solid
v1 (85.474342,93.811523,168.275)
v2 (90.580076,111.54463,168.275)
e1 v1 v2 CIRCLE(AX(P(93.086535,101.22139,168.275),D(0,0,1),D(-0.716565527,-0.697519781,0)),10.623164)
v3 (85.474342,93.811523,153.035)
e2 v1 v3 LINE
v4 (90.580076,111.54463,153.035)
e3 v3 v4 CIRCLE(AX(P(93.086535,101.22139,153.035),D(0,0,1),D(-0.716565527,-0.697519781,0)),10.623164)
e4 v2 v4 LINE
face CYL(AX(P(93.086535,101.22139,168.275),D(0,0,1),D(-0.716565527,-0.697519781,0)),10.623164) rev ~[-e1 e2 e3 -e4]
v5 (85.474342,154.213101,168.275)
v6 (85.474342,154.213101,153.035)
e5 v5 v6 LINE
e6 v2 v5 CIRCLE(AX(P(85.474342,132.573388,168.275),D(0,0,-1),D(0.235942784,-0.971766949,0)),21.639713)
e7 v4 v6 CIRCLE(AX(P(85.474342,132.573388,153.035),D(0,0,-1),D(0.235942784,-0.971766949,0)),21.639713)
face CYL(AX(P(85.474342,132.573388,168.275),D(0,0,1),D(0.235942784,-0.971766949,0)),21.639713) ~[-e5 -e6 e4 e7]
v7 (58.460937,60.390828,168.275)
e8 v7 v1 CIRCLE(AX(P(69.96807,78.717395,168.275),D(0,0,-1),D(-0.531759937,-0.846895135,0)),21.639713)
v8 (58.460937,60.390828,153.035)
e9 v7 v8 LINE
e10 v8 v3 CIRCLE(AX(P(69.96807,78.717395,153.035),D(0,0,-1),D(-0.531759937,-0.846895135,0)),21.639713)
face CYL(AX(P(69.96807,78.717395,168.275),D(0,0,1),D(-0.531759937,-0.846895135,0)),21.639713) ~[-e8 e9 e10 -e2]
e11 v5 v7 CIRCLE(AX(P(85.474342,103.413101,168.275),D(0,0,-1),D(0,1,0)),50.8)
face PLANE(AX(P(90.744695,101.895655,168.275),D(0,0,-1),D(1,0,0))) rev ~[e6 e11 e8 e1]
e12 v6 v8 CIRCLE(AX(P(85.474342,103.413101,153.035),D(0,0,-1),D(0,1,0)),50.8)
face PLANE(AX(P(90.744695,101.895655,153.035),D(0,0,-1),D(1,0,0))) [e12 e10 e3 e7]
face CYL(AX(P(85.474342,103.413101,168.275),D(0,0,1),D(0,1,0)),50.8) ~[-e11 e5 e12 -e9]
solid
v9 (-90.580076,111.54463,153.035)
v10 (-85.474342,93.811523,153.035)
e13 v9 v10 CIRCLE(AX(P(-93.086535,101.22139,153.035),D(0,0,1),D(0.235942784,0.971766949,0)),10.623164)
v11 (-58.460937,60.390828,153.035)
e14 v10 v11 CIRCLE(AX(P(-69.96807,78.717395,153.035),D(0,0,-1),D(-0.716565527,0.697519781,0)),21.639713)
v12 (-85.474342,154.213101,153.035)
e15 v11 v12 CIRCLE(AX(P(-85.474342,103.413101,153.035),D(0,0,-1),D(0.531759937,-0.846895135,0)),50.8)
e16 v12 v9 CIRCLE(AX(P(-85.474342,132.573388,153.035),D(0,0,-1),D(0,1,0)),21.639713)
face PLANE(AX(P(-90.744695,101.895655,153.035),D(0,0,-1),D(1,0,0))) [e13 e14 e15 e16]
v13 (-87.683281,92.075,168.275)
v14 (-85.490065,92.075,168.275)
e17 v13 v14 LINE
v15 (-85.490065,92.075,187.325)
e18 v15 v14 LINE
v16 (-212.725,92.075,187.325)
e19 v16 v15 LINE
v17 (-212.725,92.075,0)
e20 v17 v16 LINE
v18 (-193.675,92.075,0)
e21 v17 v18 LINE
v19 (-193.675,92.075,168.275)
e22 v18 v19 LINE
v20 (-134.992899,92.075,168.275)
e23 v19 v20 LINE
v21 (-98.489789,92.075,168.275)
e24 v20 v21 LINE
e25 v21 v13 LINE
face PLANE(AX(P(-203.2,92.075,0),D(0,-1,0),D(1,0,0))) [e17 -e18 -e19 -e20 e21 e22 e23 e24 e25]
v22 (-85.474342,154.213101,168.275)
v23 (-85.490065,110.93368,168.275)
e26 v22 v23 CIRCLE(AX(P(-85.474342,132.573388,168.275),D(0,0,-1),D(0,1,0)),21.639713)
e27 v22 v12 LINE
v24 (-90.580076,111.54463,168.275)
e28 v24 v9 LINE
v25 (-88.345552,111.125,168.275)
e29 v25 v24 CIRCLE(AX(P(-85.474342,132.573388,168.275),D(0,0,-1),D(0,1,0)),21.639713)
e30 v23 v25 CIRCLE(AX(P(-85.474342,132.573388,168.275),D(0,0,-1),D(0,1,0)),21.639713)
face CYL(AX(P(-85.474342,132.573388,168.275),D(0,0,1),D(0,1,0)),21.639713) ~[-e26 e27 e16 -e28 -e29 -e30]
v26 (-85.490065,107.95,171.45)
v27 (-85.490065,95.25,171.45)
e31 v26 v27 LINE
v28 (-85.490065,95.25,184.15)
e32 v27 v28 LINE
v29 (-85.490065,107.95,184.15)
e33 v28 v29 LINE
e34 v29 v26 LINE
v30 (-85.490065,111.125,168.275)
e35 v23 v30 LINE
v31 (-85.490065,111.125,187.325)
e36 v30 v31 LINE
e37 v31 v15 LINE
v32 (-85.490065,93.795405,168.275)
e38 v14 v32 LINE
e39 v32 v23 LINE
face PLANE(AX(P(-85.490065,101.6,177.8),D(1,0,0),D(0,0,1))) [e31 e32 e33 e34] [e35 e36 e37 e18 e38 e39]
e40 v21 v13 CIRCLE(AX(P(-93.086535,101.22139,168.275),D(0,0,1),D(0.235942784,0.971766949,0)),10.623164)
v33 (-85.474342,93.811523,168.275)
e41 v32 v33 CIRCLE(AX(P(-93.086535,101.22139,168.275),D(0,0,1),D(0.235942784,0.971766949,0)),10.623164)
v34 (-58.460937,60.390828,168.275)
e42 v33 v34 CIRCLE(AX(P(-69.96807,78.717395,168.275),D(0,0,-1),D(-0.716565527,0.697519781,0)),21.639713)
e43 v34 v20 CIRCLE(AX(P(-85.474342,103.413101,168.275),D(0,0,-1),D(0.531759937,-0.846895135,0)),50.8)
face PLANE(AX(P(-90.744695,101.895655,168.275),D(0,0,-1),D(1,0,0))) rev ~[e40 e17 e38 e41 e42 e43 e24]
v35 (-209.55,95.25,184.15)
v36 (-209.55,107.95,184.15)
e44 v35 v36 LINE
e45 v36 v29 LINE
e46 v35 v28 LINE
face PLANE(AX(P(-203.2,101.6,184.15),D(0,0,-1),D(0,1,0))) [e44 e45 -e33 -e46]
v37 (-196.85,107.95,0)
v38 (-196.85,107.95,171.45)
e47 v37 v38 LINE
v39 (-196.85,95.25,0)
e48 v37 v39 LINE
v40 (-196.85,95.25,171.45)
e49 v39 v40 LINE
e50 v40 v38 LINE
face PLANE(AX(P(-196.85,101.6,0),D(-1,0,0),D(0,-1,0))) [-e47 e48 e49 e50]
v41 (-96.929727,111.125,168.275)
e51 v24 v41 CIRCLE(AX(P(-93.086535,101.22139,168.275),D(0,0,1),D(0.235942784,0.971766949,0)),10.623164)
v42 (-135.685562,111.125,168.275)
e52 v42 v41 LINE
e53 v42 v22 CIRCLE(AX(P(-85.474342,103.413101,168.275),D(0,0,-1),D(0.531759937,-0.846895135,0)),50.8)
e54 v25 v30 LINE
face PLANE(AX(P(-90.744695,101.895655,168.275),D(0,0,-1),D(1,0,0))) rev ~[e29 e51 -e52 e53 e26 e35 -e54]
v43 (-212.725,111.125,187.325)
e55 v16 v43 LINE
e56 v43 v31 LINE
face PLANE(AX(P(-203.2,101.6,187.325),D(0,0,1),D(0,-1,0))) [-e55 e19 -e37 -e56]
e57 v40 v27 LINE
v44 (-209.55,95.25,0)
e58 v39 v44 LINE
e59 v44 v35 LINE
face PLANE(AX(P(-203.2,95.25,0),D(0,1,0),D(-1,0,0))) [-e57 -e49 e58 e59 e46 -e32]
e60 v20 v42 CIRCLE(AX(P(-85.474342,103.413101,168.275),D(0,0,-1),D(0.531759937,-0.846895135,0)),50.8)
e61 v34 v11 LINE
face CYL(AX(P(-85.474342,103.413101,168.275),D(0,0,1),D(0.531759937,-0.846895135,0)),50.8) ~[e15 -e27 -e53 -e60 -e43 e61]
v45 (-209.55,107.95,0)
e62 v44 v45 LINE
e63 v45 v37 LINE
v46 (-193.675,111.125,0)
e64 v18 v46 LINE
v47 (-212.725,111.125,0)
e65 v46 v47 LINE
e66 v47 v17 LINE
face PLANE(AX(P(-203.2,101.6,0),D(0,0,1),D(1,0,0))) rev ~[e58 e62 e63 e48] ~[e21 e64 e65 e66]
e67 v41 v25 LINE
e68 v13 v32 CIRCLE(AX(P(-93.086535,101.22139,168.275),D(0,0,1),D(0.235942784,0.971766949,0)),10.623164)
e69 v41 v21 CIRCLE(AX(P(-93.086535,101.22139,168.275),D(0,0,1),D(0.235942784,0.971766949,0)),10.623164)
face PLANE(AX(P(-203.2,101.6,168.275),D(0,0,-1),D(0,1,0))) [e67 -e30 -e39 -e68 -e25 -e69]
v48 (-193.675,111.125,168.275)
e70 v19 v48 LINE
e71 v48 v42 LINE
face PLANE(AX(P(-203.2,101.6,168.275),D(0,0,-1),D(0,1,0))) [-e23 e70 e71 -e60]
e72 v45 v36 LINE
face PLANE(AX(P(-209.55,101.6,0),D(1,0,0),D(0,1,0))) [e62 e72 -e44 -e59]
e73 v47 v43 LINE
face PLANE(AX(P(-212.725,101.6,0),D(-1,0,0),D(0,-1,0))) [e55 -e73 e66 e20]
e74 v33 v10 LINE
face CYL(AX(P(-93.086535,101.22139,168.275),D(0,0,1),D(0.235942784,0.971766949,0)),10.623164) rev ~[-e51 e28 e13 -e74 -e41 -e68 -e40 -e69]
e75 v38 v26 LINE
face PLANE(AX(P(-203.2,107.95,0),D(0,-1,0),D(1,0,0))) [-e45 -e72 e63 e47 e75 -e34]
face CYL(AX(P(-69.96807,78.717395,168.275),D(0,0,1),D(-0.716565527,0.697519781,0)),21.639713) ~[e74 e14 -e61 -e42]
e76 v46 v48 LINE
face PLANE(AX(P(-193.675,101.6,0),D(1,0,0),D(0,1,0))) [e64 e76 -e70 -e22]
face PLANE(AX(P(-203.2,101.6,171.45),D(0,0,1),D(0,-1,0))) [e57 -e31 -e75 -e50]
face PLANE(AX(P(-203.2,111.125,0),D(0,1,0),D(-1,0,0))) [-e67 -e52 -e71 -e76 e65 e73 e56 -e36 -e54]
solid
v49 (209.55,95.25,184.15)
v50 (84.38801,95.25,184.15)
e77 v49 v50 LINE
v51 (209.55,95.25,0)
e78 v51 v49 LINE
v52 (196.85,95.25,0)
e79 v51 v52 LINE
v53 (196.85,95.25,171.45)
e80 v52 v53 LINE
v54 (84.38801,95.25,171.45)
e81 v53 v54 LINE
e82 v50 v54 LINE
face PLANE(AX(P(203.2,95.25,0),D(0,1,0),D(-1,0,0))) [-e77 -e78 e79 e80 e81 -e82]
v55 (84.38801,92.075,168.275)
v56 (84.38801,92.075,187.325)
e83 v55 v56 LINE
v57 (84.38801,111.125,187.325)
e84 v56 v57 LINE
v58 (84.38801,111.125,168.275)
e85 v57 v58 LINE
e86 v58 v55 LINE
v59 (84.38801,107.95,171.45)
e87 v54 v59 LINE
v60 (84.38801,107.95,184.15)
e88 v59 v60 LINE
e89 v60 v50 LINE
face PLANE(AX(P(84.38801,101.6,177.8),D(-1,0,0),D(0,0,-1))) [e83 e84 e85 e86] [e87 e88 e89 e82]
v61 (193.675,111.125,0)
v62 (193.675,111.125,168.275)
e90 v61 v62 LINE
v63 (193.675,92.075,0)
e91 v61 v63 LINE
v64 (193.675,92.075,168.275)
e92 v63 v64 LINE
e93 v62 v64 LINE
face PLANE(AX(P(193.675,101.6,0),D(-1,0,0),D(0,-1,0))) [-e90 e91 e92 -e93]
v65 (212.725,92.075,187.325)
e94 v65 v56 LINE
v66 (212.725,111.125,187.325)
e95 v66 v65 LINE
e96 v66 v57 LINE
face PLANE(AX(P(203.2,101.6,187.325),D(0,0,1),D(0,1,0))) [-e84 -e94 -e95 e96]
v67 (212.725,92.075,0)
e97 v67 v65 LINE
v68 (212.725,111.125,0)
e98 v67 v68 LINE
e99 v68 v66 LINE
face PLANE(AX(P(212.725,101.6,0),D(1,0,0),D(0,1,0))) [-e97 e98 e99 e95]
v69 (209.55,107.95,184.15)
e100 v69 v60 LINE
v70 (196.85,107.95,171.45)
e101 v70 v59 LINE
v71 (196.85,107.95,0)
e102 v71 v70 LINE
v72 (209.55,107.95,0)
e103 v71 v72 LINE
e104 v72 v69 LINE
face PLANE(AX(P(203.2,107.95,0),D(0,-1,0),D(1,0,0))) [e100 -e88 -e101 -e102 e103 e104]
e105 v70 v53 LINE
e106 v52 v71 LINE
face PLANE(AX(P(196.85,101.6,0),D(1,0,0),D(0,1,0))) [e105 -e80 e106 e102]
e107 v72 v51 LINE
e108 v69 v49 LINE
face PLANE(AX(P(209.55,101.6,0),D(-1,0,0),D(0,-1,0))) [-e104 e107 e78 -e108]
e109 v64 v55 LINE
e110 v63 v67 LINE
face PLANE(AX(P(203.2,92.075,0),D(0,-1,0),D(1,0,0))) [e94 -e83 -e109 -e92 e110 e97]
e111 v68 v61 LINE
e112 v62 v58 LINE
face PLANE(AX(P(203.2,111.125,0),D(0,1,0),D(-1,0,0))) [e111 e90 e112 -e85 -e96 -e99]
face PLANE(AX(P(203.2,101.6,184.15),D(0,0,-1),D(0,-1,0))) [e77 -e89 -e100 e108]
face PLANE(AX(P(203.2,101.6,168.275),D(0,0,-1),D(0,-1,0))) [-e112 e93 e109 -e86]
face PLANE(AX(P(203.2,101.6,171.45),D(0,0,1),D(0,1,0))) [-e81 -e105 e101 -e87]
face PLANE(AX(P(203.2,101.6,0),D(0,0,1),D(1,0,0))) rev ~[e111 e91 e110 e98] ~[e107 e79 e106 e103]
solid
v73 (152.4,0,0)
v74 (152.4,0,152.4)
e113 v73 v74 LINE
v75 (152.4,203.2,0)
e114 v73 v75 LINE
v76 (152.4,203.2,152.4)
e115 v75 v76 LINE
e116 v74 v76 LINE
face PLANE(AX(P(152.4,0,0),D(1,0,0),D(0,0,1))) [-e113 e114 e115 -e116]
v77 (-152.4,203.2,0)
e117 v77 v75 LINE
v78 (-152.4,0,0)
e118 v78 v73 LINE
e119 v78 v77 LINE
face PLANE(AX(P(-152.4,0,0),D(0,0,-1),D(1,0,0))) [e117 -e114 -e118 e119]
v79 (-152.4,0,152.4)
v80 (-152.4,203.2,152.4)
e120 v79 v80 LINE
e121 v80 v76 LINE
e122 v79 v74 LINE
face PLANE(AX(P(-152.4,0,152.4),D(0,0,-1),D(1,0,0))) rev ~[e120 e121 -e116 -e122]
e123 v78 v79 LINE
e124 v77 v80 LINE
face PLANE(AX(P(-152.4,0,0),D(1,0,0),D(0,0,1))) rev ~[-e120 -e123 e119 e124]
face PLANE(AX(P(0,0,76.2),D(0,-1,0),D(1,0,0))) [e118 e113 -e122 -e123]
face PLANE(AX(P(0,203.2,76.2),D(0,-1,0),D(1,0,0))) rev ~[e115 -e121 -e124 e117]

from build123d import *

# Parameters (mm, degrees)
F0_W     = 304.8
F0_H     = 152.4
F1_DEPTH = 203.2
F4_W     = 19.05
F4_H     = 19.05
F4_W_2   = 12.7
F4_H_2   = 12.7
F8_DEPTH = 15.24


with BuildPart() as f1:
    # F0 (on Front) → F1 (new body)
    with BuildSketch(Plane.XZ):
        with Locations((0, 76.2)):
            Rectangle(F0_W, F0_H)
    extrude(amount=-F1_DEPTH)


with BuildPart() as f5:
    # F5: sweep along a path in F3
    with BuildLine(Plane.XZ.offset(-101.6)) as f5_path:
        Line((203.2, 0), (203.2, 177.8))
        Line((203.2, 177.8), (84.3880101994, 177.8))
    # F4 (on Top) → F5 (sweep)
    with BuildSketch(Plane.XY):
        with Locations((203.2, 101.6)):
            Rectangle(F4_W, F4_H)
        with Locations((203.2, 101.6)):
            Rectangle(F4_W_2, F4_H_2, mode=Mode.SUBTRACT)
    sweep(path=f5_path.line, transition=Transition.RIGHT)


with BuildPart() as f6:
    # F6: sweep along a path in F3
    with BuildLine(Plane.XZ.offset(-101.6)) as f6_path:
        Line((-203.2, 0), (-203.2, 177.8))
        Line((-203.2, 177.8), (-85.4900650759, 177.8))
    # F4 (on Top) → F6 (sweep)
    with BuildSketch(Plane.XY):
        with Locations((-203.2, 101.6)):
            Rectangle(F4_W, F4_H)
        with Locations((-203.2, 101.6)):
            Rectangle(F4_W_2, F4_H_2, mode=Mode.SUBTRACT)
    sweep(path=f6_path.line, transition=Transition.RIGHT)

    # F7 (on face) → F8 (join)
    with BuildSketch(Plane(origin=(0, 0, 168.275), x_dir=(1, 0, 0), z_dir=(0, 0, -1))):
        with BuildLine():
            ThreePointArc((-58.4609373129, -60.3908278193), (-134.2912011879, -89.357700658), (-85.4743421078, -154.2131006718))
            ThreePointArc((-85.4743421078, -154.2131006718), (-63.9879107494, -130.0023087379), (-90.5800762449, -111.5446297711))
            ThreePointArc((-90.5800762449, -111.5446297711), (-103.2949896459, -98.2821615992), (-85.4743421078, -93.8115233757))
            ThreePointArc((-85.4743421078, -93.8115233757), (-53.1385123205, -92.3204531035), (-58.4609373129, -60.3908278193))
        make_face()
    extrude(amount=F8_DEPTH)


with BuildPart() as f8:
    # F7 (on face) → F8, piece 2 (new body)
    with BuildSketch(Plane(origin=(0, 0, 168.275), x_dir=(1, 0, 0), z_dir=(0, 0, -1))):
        with BuildLine():
            ThreePointArc((58.4609373129, -60.3908278193), (53.1385123205, -92.3204531035), (85.4743421078, -93.8115233757))
            ThreePointArc((85.4743421078, -93.8115233757), (103.2949896459, -98.2821615992), (90.5800762449, -111.5446297711))
            ThreePointArc((90.5800762449, -111.5446297711), (63.9879107494, -130.0023087379), (85.4743421078, -154.2131006718))
            ThreePointArc((85.4743421078, -154.2131006718), (134.2912011879, -89.357700658), (58.4609373129, -60.3908278193))
        make_face()
    extrude(amount=F8_DEPTH)


solid = Compound([f1.part, f5.part, f6.part, f8.part])
